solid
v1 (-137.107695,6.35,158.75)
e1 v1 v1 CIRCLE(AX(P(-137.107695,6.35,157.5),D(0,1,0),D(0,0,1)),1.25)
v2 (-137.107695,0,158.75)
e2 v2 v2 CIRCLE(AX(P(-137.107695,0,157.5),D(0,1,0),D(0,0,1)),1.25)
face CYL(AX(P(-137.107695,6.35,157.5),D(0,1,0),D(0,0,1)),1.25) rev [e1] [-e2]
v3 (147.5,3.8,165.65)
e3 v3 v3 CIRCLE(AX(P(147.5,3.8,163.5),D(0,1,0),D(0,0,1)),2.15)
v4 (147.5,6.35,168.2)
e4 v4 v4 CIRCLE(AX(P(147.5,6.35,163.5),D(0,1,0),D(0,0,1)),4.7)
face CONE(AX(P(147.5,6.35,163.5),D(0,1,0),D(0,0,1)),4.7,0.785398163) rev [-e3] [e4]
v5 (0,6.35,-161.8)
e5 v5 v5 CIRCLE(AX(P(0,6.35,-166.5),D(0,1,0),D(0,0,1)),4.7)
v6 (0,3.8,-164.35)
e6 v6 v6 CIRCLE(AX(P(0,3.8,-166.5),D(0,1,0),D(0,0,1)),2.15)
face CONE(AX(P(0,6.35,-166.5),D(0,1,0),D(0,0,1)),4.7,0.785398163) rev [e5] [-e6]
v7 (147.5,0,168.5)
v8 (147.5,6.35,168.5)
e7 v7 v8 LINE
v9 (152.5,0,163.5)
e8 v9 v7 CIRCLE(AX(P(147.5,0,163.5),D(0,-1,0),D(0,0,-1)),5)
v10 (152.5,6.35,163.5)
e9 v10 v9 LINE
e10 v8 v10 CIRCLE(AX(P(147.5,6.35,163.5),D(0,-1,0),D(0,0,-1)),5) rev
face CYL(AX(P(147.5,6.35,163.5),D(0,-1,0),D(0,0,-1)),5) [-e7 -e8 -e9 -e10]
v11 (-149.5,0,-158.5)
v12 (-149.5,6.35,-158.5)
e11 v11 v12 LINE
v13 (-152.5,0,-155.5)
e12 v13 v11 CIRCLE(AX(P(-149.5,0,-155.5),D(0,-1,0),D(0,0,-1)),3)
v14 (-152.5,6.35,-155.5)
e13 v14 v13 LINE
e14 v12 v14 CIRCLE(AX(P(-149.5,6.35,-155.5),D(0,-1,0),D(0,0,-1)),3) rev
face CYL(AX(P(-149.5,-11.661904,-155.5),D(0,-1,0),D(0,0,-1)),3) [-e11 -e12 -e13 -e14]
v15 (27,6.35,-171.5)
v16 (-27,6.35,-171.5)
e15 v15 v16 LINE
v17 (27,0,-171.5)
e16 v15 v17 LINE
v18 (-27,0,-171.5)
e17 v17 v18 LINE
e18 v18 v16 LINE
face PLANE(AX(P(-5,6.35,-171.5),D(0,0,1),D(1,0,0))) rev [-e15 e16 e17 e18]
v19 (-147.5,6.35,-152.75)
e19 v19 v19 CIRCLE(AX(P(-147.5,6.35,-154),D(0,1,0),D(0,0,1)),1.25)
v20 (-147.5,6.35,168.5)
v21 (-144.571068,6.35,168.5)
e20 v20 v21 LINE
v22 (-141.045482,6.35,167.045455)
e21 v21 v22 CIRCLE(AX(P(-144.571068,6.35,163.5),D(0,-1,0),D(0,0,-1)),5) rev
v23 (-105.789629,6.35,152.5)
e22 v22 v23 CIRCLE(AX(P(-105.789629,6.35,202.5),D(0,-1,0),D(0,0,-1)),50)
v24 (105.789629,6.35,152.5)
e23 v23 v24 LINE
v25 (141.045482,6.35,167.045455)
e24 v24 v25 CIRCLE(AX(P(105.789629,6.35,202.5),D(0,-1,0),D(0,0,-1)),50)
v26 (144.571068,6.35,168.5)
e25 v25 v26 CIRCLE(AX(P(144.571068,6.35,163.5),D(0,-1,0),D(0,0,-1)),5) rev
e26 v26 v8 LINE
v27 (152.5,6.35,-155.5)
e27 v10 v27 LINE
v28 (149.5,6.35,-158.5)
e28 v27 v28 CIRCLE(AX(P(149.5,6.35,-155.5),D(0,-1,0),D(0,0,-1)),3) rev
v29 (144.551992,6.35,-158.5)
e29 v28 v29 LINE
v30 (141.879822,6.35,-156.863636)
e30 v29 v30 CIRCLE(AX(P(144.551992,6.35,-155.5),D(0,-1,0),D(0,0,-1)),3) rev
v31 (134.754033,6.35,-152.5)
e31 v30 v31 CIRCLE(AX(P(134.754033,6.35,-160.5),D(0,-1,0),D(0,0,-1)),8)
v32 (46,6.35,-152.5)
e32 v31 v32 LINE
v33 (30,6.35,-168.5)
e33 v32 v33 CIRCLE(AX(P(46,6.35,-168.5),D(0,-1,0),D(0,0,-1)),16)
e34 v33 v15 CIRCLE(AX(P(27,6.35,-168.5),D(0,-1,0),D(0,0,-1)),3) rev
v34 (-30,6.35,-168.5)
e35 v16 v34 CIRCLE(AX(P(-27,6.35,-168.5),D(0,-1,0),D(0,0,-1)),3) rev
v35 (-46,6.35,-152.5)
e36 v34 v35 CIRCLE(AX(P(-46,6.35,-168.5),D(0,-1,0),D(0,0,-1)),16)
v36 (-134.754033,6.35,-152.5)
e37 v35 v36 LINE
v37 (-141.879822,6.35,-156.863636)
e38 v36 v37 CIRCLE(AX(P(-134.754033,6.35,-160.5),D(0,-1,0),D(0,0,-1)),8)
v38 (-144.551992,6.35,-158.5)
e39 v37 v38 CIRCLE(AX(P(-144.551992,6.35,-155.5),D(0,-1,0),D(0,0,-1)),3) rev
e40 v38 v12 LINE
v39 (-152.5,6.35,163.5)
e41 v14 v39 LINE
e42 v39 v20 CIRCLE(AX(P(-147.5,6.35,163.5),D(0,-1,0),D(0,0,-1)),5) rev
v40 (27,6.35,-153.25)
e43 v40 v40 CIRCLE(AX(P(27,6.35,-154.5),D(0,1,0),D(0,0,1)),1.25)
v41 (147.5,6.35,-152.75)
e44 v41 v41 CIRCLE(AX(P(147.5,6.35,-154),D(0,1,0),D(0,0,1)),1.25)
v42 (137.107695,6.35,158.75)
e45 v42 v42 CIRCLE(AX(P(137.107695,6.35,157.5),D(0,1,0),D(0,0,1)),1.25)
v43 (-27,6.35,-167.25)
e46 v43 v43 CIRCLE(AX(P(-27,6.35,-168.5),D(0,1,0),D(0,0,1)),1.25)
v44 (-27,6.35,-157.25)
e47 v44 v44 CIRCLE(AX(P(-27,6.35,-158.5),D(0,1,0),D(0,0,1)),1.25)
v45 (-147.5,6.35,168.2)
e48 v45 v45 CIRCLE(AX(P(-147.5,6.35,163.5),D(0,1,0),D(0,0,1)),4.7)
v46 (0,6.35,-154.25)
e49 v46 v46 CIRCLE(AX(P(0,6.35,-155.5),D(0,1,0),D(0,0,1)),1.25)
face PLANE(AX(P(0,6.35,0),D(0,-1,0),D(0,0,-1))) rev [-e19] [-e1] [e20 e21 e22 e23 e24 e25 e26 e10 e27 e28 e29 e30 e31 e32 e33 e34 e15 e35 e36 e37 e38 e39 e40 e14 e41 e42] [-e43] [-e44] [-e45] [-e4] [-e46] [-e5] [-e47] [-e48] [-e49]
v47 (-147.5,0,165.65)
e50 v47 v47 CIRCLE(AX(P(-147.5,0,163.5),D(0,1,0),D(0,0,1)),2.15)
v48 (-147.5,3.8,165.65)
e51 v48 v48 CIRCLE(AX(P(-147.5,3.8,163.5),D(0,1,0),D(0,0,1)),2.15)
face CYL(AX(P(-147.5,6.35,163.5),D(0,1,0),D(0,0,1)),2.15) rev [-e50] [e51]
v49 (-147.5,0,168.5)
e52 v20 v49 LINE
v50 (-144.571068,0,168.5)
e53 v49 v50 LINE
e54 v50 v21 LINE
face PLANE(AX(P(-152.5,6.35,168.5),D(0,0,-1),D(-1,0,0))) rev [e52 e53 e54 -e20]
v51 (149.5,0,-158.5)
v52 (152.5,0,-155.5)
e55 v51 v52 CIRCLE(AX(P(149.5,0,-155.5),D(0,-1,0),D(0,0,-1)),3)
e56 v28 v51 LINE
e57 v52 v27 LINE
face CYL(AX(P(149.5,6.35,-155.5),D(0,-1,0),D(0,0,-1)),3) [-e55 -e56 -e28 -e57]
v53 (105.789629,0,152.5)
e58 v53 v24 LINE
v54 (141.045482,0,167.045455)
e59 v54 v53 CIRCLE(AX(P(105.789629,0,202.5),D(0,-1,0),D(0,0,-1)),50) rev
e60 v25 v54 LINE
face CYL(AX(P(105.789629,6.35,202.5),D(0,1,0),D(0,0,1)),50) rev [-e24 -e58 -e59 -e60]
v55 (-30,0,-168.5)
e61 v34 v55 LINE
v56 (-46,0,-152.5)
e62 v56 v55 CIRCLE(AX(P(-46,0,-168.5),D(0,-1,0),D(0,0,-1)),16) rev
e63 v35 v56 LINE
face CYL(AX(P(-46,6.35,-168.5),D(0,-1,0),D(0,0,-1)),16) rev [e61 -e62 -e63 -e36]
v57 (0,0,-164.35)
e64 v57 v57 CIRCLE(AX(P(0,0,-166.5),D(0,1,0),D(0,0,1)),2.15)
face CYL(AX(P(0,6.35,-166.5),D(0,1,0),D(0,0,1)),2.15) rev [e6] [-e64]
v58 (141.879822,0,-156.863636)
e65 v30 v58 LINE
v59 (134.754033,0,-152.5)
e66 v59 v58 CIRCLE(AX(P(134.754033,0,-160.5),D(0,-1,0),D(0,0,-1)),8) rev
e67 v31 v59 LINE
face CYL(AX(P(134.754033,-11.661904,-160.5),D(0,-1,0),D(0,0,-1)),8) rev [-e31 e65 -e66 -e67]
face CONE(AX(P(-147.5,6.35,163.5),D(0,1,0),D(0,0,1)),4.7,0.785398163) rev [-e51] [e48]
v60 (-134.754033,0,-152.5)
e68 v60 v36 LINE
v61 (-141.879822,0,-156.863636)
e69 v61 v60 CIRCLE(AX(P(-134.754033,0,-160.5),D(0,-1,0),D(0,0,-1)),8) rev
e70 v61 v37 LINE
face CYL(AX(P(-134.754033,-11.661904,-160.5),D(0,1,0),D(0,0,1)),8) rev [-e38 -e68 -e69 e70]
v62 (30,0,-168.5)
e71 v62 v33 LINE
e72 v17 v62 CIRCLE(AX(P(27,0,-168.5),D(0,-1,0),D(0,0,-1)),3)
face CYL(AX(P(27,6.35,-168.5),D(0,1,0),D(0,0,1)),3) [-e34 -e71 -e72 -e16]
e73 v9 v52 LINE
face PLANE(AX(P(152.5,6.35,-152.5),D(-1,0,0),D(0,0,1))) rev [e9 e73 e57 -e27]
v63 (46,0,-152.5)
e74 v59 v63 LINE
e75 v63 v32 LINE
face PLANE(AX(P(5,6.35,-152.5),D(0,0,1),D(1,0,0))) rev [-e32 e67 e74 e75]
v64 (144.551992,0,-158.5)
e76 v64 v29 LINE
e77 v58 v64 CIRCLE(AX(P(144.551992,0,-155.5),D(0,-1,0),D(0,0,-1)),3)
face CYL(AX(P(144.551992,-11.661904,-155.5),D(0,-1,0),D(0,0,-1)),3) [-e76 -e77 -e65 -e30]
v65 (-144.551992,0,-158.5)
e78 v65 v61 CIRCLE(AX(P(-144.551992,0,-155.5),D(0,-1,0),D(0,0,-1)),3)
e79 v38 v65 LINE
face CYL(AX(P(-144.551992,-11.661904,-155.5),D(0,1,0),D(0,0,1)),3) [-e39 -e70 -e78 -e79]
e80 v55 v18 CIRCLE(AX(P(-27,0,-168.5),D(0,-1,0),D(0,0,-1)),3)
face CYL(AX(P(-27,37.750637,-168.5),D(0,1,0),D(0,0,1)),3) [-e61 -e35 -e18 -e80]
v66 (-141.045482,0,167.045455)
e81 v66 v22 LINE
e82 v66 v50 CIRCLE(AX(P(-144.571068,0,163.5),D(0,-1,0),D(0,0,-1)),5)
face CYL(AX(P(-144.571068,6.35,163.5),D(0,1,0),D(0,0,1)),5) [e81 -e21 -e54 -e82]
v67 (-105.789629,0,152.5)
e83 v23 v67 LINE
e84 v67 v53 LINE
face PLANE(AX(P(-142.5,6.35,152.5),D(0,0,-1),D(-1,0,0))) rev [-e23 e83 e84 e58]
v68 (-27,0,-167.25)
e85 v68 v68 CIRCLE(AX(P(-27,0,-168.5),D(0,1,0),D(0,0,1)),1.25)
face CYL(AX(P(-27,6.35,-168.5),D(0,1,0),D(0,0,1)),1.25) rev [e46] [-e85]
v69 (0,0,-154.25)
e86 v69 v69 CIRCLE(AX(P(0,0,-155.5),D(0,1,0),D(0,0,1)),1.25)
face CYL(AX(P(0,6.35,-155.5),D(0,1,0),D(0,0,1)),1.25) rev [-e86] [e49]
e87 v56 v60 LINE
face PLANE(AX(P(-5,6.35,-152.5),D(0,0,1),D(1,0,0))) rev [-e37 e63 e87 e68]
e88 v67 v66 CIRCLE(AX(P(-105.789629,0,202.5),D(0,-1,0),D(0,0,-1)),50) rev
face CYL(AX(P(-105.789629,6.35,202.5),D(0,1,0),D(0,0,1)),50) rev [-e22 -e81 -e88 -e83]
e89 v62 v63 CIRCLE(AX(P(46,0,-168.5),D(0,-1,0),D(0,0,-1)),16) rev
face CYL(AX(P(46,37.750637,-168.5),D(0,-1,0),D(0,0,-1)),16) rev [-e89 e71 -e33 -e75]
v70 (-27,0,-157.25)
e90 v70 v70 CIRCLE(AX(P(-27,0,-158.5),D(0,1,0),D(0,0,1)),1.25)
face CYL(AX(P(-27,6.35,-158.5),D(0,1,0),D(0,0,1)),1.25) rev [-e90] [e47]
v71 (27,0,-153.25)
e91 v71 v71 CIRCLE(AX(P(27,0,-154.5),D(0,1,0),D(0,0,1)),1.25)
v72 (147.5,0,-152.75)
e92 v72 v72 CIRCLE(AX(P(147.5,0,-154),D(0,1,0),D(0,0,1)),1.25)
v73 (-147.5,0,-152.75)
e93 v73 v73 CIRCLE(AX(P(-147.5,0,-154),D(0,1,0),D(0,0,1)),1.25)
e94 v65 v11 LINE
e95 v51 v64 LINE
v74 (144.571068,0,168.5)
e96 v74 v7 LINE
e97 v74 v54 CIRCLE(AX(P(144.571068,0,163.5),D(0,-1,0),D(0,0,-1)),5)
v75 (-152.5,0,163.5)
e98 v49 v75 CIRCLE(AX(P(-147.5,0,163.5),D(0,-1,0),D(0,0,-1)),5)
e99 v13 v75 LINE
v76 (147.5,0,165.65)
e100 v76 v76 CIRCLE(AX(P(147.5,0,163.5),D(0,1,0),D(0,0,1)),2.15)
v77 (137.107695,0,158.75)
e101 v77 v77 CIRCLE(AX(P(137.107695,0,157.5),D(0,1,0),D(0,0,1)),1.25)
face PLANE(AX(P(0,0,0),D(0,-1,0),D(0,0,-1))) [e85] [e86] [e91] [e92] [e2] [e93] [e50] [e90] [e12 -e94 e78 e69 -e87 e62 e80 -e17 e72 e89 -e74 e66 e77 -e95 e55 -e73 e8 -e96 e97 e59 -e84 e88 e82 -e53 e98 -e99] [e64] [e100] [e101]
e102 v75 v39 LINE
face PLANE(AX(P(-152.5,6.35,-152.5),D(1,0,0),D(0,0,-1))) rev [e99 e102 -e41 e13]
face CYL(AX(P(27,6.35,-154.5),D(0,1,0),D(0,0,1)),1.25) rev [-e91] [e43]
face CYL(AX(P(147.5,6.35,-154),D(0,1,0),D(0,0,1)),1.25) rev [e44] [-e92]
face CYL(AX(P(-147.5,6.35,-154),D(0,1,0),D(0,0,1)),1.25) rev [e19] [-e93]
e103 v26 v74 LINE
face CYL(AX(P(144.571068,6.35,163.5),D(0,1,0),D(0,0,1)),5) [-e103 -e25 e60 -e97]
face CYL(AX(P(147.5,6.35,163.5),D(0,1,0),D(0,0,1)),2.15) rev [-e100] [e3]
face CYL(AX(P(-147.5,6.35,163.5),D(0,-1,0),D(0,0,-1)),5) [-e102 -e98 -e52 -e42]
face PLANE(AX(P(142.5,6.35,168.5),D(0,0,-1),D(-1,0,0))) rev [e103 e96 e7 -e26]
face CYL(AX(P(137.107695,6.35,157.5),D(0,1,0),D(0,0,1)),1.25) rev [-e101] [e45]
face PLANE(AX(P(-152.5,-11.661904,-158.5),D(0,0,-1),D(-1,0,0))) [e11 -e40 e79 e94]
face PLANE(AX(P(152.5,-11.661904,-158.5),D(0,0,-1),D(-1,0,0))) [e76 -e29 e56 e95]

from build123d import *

# Parameters (mm, degrees)
BOSS_EXTRUDE1_DEPTH                             = 6.35
CSK_FOR_M4_FLAT_HEAD_MACHINE_SCREW1_D           = 4.3
CSK_FOR_M4_FLAT_HEAD_MACHINE_SCREW1_CSINK_D     = 9.4
CSK_FOR_M4_FLAT_HEAD_MACHINE_SCREW1_CSINK_ANGLE = 90
CHAMFER1_SIZE                                   = 16
SKETCH6_W                                       = 10
SKETCH6_H                                       = 6
BOSS_EXTRUDE2_DEPTH                             = 6.35
FILLET5_R                                       = 8
M3X0_5_TAPPED_HOLE1_D                           = 2.5
FILLET6_START                                   = -1
FILLET6_DEPTH                                   = 8
SKETCH18_W                                      = 25
SKETCH18_H                                      = 19
BOSS_EXTRUDE4_DEPTH                             = 6.35
FILLET12_R                                      = 3
M3X0_5_TAPPED_HOLE2_D                           = 2.5
FILLET13_R                                      = 50
FILLET14_R                                      = 16


with BuildPart() as part:
    # Sketch1 → Boss-Extrude1 (new body)
    with BuildSketch(Plane(origin=(0, 0, 0), x_dir=(1, 0, 0), z_dir=(0, 1, 0))):
        Polygon((-5, 171.5), (5, 171.5), (5, 152.5), (152.5, 152.5), (152.5, -168.5), (142.5, -168.5), (142.5, -152.5), (-142.5, -152.5), (-142.5, -168.5), (-152.5, -168.5), (-152.5, 152.5), (-5, 152.5), align=None)
    extrude(amount=BOSS_EXTRUDE1_DEPTH)

    # CSK for M4 Flat Head Machine Screw1 (through all)
    with Locations(Plane(origin=(0, 6.35, 0), x_dir=(1, 0, 0), z_dir=(0, 1, 0))):
        with Locations((0, 166.5), (-147.5, -163.5), (147.5, -163.5)):
            CounterSinkHole(CSK_FOR_M4_FLAT_HEAD_MACHINE_SCREW1_D / 2, CSK_FOR_M4_FLAT_HEAD_MACHINE_SCREW1_CSINK_D / 2, counter_sink_angle=CSK_FOR_M4_FLAT_HEAD_MACHINE_SCREW1_CSINK_ANGLE)

    # Chamfer1
    chamfer1_edges = [part.edges().sort_by_distance(p)[0] for p in [
        (142.5, 3.175, 152.5),
        (-142.5, 3.175, 152.5),
    ]]
    chamfer(chamfer1_edges, length=CHAMFER1_SIZE - 0.0001)  # a hair under: the kernel refuses the full size

    # Sketch6 → Boss-Extrude2 (add)
    with BuildSketch(Plane(origin=(0, 6.35, 0), x_dir=(1, 0, 0), z_dir=(0, 1, 0))):
        with Locations((-147.5, 155.5)):
            Rectangle(SKETCH6_W, SKETCH6_H)
        with Locations((147.5, 155.5)):
            Rectangle(SKETCH6_W, SKETCH6_H)
    extrude(amount=-BOSS_EXTRUDE2_DEPTH)

    # Fillet5
    # the kernel refuses this fillet: 8 mm, written as the material it adds along each edge
    with BuildSketch(Plane(origin=(142.5, 6.35, -152.5), x_dir=(0, 0, -1), z_dir=(0, -1, 0))) as fillet5_piece_1:
        with BuildLine():
            CenterArc((8, -7.745966692), FILLET5_R, 104.477512186, 75.522487814)
            Line((0, -7.745966692), (-0.16, -7.745966692))
            Line((-0.16, -7.745966692), (-0.16, 0))
            Line((-0.16, 0), (0, 0.16))
            ThreePointArc((0, 0.16), (3, 0.16), (5.96, 0.154919334))
            Line((5.96, 0.154919334), (6, 0))
        make_face()
    extrude(amount=6.35)
    with BuildSketch(Plane(origin=(-142.5, 6.35, -152.5), x_dir=(1, 0, 0), z_dir=(0, -1, 0))) as fillet5_piece_2:
        with BuildLine():
            CenterArc((7.745966692, -8), FILLET5_R, 90, 75.522487814)
            Line((0, -6), (-0.154919334, -5.96))
            ThreePointArc((-0.154919334, -5.96), (-0.16, -3), (-0.16, 0))
            Line((-0.16, 0), (0, 0.16))
            Line((0, 0.16), (7.745966692, 0.16))
            Line((7.745966692, 0.16), (7.745966692, 0))
        make_face()
    extrude(amount=6.35)

    # M3x0.5 Tapped Hole1 (through all)
    with Locations(Plane(origin=(0, 6.35, 0), x_dir=(1, 0, 0), z_dir=(0, 1, 0))):
        with Locations((-147.5, 154), (147.5, 154), (137.107695155, -157.5), (-137.107695155, -157.5), (0, 155.5)):
            Hole(M3X0_5_TAPPED_HOLE1_D / 2)

    # Fillet6: read off the stored shape, not the designer's step
    # Fillet6 outline → Fillet6 (cut)
    with BuildSketch(Plane(origin=(0, 0, 0), x_dir=(1, 0, 0), z_dir=(0, 1, 0)).offset(FILLET6_START)):
        with BuildLine():
            ThreePointArc((152.5, -163.5), (151.035533906, -167.035533906), (147.5, -168.5))
            Line((147.5, -168.5), (152.5, -168.5))
            Line((152.5, -168.5), (152.5, -163.5))
        make_face()
        with BuildLine():
            ThreePointArc((144.571067812, -168.5), (142.65765065, -168.119397663), (141.035533906, -167.035533906))
            Line((141.035533906, -167.035533906), (142.5, -168.5))
            Line((142.5, -168.5), (144.571067812, -168.5))
        make_face()
        with BuildLine():
            ThreePointArc((-141.035533906, -167.035533906), (-142.65765065, -168.119397663), (-144.571067812, -168.5))
            Line((-144.571067812, -168.5), (-142.5, -168.5))
            Line((-142.5, -168.5), (-141.035533906, -167.035533906))
        make_face()
        with BuildLine():
            Line((-152.5, -168.5), (-147.5, -168.5))
            ThreePointArc((-147.5, -168.5), (-151.035533906, -167.035533906), (-152.5, -163.5))
            Line((-152.5, -163.5), (-152.5, -168.5))
        make_face()
    extrude(amount=FILLET6_DEPTH, mode=Mode.SUBTRACT)

    # Sketch18 → Boss-Extrude4 (add)
    with BuildSketch(Plane.XZ):
        with Locations((17.5, -162)):
            Rectangle(SKETCH18_W, SKETCH18_H)
        with Locations((-17.5, -162)):
            Rectangle(SKETCH18_W, SKETCH18_H)
    extrude(amount=-BOSS_EXTRUDE4_DEPTH)

    # Fillet12
    fillet12_edges = [part.edges().sort_by_distance(p)[0] for p in [
        (30, 3.175, -171.5),
        (-30, 3.175, -171.5),
        (-142.5, 3.175, -158.5),
        (-152.5, 3.175, -158.5),
        (142.5, 3.175, -158.5),
        (152.5, 3.175, -158.5),
    ]]
    fillet(fillet12_edges, radius=FILLET12_R)

    # M3x0.5 Tapped Hole2 (through all)
    with Locations(Plane(origin=(0, 6.35, 0), x_dir=(1, 0, 0), z_dir=(0, 1, 0))):
        with Locations((27, 154.5), (-27, 168.5), (-27, 158.5)):
            Hole(M3X0_5_TAPPED_HOLE2_D / 2)

    # Fillet13
    # the kernel refuses this fillet: 50 mm, written as the material it adds along each edge
    with BuildSketch(Plane(origin=(126.5001, 0, 152.5), x_dir=(-1, 0, 0), z_dir=(0, 1, 0))) as fillet13_piece_1:
        with BuildLine():
            CenterArc((20.710446515, 50), FILLET13_R, 225.146645298, 44.853354702)
            Line((-14.554286856, 14.554286856), (-15.259581524, 13.845372594))
            Line((-15.259581524, 13.845372594), (-0.707106781, -0.707106781))
            Line((-0.707106781, -0.707106781), (0, -1))
            Line((0, -1), (20.710446515, -1))
            Line((20.710446515, -1), (20.710446515, 0))
        make_face()
    extrude(amount=6.35)
    with BuildSketch(Plane(origin=(-126.5001, 0, 152.5), x_dir=(-0.7071067811865476, 0, 0.7071067811865476), z_dir=(0, 1, 0))) as fillet13_piece_2:
        with BuildLine():
            CenterArc((20.710841887, 49.999836231), FILLET13_R, 225, 44.853354702)
            Line((-14.644497172, 14.644497172), (-15.351603953, 13.937390391))
            Line((-15.351603953, 13.937390391), (-0.707106781, -0.707106781))
            Line((-0.707106781, -0.707106781), (0, -1))
            Line((0, -1), (20.580310423, -0.999996725))
            Line((20.580310423, -0.999996725), (20.582869863, 0))
        make_face()
    extrude(amount=6.35)

    # Fillet14
    fillet14_edges = [part.edges().sort_by_distance(p)[0] for p in [
        (30, 3.175, -152.5),
        (-30, 3.175, -152.5),
    ]]
    fillet(fillet14_edges, radius=FILLET14_R - 0.0001)  # a hair under: the kernel refuses the full size


solid = part.part
